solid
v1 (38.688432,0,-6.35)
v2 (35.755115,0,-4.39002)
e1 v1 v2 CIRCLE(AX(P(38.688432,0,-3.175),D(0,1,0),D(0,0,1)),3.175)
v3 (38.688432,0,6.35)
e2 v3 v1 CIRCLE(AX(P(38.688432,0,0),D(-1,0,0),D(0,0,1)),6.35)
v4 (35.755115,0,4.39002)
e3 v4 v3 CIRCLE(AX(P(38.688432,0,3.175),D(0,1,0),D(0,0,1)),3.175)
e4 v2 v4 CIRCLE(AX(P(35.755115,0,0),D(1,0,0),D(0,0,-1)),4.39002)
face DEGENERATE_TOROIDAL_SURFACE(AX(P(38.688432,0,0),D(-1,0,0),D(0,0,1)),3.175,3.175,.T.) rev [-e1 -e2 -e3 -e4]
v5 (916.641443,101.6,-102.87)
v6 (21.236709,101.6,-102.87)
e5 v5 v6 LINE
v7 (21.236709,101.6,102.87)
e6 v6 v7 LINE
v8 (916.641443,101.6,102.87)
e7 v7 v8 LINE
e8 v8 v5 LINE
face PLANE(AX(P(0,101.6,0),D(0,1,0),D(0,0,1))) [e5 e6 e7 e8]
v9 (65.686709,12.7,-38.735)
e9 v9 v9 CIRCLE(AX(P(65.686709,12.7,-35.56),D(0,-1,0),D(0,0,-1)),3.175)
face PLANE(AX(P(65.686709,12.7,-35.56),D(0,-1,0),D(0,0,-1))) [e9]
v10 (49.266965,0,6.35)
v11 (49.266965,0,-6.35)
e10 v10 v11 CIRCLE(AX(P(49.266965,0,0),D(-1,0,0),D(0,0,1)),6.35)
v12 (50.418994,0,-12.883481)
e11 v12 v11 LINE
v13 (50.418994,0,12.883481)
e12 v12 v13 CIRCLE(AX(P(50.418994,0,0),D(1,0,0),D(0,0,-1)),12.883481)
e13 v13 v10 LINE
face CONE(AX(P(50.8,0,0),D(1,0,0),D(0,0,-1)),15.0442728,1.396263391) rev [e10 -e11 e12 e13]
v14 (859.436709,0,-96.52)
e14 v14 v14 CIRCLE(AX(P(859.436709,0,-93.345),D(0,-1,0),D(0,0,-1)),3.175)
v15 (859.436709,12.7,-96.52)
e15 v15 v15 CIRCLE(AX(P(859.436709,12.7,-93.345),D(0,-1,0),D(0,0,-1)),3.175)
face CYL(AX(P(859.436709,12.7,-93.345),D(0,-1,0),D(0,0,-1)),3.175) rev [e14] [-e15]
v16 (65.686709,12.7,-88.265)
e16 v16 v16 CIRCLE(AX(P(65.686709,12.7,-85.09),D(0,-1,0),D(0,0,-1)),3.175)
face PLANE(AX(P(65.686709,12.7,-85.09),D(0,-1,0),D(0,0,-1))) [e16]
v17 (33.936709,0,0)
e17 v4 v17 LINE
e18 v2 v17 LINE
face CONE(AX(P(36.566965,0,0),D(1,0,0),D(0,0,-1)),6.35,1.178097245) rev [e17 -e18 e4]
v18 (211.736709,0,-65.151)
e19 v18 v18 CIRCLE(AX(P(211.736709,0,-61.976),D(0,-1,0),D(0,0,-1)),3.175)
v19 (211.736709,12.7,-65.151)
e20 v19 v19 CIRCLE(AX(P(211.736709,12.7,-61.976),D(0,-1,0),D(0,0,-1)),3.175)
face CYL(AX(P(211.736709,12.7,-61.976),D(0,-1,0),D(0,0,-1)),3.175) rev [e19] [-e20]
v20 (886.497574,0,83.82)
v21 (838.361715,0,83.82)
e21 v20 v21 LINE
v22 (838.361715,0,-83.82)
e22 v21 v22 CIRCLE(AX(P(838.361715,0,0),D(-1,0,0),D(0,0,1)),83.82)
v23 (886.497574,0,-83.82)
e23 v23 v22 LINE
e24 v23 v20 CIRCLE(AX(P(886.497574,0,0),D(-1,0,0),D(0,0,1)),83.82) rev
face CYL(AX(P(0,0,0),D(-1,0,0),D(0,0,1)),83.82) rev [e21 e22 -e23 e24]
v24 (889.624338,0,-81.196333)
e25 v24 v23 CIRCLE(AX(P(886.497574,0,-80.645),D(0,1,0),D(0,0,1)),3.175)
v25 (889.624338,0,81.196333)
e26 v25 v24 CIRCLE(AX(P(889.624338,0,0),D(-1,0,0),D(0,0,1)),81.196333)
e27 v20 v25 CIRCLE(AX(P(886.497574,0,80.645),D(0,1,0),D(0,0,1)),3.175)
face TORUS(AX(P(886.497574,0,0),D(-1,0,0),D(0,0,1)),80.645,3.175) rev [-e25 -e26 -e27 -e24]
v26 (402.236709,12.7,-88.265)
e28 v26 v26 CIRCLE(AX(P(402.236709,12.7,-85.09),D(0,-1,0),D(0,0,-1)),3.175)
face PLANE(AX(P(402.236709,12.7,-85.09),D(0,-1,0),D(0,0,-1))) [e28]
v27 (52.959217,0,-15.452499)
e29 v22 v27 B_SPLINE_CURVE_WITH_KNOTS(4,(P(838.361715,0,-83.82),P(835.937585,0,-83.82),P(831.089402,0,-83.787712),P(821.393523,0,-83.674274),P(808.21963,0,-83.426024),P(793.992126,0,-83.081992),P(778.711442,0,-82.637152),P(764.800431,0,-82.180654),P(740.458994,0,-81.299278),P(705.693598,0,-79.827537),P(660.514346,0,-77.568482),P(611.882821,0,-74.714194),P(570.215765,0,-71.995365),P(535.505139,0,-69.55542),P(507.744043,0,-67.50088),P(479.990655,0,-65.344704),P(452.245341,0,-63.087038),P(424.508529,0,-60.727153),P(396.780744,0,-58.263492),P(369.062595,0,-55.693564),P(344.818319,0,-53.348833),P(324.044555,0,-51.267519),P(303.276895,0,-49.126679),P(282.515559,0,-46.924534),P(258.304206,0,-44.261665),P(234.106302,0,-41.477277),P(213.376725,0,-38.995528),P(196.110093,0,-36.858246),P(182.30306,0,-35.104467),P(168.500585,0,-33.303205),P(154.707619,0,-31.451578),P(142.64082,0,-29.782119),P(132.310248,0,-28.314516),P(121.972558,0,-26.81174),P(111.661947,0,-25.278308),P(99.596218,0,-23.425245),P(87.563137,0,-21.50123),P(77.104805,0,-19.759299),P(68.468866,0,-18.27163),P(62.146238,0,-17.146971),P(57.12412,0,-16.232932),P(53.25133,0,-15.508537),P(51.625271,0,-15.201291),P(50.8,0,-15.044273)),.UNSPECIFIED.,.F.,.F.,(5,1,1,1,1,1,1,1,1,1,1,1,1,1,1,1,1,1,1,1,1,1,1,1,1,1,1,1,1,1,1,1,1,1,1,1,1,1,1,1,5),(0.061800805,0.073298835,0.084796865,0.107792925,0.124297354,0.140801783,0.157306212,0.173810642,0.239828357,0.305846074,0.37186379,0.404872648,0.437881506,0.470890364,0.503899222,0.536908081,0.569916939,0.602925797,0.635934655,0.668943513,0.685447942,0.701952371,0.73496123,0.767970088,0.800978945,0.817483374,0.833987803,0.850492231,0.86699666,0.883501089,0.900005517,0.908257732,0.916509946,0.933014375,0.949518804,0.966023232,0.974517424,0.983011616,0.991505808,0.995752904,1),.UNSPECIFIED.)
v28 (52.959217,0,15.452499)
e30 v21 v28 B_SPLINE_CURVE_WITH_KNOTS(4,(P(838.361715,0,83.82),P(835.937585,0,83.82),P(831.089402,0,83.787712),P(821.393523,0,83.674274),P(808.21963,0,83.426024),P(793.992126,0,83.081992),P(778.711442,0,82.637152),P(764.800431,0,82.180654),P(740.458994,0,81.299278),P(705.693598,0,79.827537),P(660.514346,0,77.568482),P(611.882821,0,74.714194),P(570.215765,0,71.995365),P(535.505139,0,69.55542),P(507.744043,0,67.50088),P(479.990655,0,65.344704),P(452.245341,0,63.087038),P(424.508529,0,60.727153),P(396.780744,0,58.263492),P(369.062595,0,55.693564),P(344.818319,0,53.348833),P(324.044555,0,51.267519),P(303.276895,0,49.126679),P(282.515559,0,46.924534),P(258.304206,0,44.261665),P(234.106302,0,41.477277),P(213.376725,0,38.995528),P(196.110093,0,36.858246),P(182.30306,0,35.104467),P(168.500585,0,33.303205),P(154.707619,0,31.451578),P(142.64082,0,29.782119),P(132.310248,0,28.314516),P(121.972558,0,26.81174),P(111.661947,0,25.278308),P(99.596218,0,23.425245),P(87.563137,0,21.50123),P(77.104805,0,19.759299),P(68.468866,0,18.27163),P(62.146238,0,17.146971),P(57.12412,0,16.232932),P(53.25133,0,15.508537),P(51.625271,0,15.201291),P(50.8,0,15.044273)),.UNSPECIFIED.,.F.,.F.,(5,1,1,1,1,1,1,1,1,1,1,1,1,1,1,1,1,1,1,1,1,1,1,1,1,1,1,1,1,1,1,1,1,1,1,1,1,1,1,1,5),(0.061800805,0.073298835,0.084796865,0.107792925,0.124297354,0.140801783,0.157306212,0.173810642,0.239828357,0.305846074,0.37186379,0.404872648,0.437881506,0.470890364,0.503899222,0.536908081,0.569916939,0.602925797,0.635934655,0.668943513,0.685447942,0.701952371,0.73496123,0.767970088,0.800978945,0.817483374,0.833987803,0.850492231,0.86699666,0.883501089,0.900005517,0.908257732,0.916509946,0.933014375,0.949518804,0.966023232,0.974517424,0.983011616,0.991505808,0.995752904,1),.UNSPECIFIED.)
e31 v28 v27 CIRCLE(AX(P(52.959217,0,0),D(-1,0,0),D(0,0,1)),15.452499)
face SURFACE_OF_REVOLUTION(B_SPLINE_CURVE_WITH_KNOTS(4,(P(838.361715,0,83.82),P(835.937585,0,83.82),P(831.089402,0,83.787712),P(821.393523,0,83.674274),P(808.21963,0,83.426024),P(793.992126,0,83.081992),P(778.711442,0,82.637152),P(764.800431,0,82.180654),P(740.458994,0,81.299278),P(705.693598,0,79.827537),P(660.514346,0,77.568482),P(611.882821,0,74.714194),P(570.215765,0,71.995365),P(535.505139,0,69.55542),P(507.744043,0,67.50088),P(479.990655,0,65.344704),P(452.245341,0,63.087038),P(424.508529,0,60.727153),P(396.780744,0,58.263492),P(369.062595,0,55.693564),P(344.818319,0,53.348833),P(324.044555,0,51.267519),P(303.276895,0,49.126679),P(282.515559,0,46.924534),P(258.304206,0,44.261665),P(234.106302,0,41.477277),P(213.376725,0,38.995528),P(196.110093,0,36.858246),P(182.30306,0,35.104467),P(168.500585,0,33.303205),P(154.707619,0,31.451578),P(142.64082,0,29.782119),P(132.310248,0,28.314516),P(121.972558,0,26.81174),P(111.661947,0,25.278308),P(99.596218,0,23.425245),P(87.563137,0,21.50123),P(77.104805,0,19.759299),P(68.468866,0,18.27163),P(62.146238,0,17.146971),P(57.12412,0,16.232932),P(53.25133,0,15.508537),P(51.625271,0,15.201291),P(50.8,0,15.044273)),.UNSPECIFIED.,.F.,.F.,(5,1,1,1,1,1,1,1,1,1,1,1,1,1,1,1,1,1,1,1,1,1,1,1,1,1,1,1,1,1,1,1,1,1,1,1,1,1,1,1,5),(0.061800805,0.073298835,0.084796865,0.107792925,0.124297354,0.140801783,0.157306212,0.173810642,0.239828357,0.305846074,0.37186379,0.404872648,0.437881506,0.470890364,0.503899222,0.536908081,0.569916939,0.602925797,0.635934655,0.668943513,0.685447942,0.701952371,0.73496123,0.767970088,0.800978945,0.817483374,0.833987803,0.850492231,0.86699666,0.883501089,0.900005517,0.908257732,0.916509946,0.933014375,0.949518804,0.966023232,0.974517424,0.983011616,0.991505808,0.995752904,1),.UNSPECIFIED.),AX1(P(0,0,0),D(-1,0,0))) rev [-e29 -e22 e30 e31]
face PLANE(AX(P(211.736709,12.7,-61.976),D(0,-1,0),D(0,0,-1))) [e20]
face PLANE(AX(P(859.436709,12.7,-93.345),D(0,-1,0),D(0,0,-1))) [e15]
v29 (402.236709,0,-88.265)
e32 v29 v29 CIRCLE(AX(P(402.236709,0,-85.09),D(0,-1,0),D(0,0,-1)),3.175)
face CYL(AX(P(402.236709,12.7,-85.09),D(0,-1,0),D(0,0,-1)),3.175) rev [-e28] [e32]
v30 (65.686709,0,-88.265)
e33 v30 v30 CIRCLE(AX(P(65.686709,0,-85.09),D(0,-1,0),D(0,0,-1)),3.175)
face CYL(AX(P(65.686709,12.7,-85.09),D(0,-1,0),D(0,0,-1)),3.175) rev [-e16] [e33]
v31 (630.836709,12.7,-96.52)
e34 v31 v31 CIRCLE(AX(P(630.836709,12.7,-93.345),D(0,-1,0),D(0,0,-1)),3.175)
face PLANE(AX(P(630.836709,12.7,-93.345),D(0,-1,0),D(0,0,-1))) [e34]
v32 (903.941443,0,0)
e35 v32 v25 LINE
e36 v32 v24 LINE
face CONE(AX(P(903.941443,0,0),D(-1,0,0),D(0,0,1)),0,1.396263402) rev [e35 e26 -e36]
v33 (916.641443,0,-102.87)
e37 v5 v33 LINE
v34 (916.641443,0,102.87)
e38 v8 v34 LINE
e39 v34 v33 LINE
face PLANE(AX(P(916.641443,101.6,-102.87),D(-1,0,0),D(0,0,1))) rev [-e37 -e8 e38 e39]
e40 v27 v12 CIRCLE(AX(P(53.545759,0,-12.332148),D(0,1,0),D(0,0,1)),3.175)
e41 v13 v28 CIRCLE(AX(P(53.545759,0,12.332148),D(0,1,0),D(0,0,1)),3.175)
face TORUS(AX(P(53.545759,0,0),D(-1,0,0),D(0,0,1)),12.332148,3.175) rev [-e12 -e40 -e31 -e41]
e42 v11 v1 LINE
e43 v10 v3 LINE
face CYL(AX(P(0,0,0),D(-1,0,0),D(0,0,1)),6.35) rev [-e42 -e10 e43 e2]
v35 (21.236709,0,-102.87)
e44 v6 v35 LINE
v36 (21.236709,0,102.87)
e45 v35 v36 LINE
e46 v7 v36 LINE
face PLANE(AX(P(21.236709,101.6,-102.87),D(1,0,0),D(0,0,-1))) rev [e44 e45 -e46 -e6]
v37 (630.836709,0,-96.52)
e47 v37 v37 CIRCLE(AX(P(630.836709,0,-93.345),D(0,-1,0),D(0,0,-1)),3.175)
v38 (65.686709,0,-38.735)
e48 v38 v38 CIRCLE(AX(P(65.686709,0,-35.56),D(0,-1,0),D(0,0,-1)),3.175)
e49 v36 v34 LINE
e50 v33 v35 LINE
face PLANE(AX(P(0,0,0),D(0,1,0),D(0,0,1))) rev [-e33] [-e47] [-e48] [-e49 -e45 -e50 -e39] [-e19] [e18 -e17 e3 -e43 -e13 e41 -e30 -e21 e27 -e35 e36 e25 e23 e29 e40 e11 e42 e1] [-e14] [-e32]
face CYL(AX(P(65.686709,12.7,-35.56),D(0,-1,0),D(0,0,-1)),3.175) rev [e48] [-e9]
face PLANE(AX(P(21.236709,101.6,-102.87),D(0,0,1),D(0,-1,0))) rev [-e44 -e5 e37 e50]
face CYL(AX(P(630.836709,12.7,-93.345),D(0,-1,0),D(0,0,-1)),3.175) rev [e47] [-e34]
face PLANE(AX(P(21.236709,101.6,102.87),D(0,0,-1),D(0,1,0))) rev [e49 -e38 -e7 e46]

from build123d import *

# Parameters (mm, degrees)
REVOLVE1_ANGLE         = 180
SKETCH5_W              = 895.40473358
SKETCH5_H              = 205.74
BOSS_EXTRUDE1_DEPTH    = 38.1
SKETCH9_W              = 895.40473358
SKETCH9_H              = 205.74
BOSS_EXTRUDE5_DEPTH    = 101.6
FILLET1_R              = 3.175
CUT_EXTRUDE1_OUTLINE_R = 3.175
CUT_EXTRUDE1_DEPTH     = 12.7


# Read off the part's stored shape, not the designer's step: Cut-Extrude1
with BuildPart() as part:
    # Sketch4 → Revolve1 (revolve)
    with BuildSketch(Plane(origin=(0, 0, 0), x_dir=(1, 0, 0), z_dir=(0, 1, 0))):
        with BuildLine():
            Line((838.361715067, 83.82), (889.161715067, 83.82))
            Line((889.161715067, 83.82), (903.94144259, 0))
            Line((903.94144259, 0), (33.93670901, 0))
            Line((33.93670901, 0), (36.566965131, 6.35))
            Line((36.566965131, 6.35), (49.266965131, 6.35))
            Line((49.266965131, 6.35), (50.8, 15.04427278))
            add(Edge.make_bspline(
                [(50.8, 15.04427278), (51.625271193, 15.201290881), (53.251330207, 15.508536828), (57.124119543, 16.232931828), (62.146237859, 17.146971323), (68.468865546, 18.271630494), (77.104805357, 19.759299021), (87.563136705, 21.501230362), (99.596217659, 23.425244589), (111.661947143, 25.278307663), (121.972557789, 26.811740179), (132.310247749, 28.314515819), (142.640819969, 29.78211892), (154.707618563, 31.451577511), (168.50058462, 33.303205201), (182.303059594, 35.104467069), (196.110093108, 36.858246399), (213.376725128, 38.995527561), (234.106301617, 41.477276739), (258.304205533, 44.261664544), (282.515559062, 46.924534133), (303.276895107, 49.126678738), (324.044555274, 51.267518561), (344.81831943, 53.348832955), (369.062594865, 55.693564026), (396.78074426, 58.263492413), (424.508528664, 60.72715323), (452.245340769, 63.087037809), (479.990655319, 65.344703609), (507.744043491, 67.50088036), (535.505139038, 69.555419915), (570.215765491, 71.995364991), (611.882821301, 74.714193718), (660.514345839, 77.568482026), (705.693597747, 79.827536832), (740.458993877, 81.299277883), (764.800431333, 82.180653766), (778.711441945, 82.6371517), (793.992125907, 83.081992109), (808.219629905, 83.426024247), (821.393522916, 83.6742739), (831.089402446, 83.787712376), (835.937585304, 83.82), (838.361715067, 83.82)],
                knots=[0.061800805, 0.061800805, 0.061800805, 0.061800805, 0.061800805, 0.066047901, 0.070294997, 0.078789189, 0.087283381, 0.095777573, 0.112282002, 0.12878643, 0.145290859, 0.153543073, 0.161795288, 0.178299717, 0.194804145, 0.211308574, 0.227813002, 0.244317431, 0.26082186, 0.293830717, 0.326839575, 0.359848434, 0.376352863, 0.392857292, 0.42586615, 0.458875008, 0.491883866, 0.524892724, 0.557901583, 0.590910441, 0.623919299, 0.656928157, 0.689937015, 0.755954731, 0.821972448, 0.887990163, 0.904494593, 0.920999022, 0.937503451, 0.95400788, 0.97700394, 0.98850197, 1, 1, 1, 1, 1], degree=4))
        make_face()
    revolve(axis=Axis((0, 0, 0), (1, 0, 0)), revolution_arc=REVOLVE1_ANGLE)

    # Sketch5 → Boss-Extrude1 (add)
    with BuildSketch(Plane.XZ):
        with Locations((468.9390758, 0)):
            Rectangle(SKETCH5_W, SKETCH5_H)
    extrude(amount=BOSS_EXTRUDE1_DEPTH)


with BuildPart() as body_2:
    # Sketch9 → Boss-Extrude5 (new body)
    with BuildSketch(Plane(origin=(0, 0, 0), x_dir=(1, 0, 0), z_dir=(0, 1, 0))):
        with Locations((468.9390758, 0)):
            Rectangle(SKETCH9_W, SKETCH9_H)
    extrude(amount=BOSS_EXTRUDE5_DEPTH)

    # Combine1: cut part
    add(part.part, mode=Mode.SUBTRACT)

    # Fillet1
    fillet1_edges = [body_2.edges().sort_by_distance(p)[0] for p in [
        (889.161715067, 83.82, 0),
        (50.8, 15.04427278, 0),
        (36.566965131, 6.35, 0),
    ]]
    fillet(fillet1_edges, radius=FILLET1_R)

    # Cut-Extrude1 outline → Cut-Extrude1 (cut)
    with BuildSketch(Plane(origin=(0, 0, 0), x_dir=(1, 0, 0), z_dir=(0, 1, 0))):
        with Locations((65.68670901, 35.56)):
            Circle(CUT_EXTRUDE1_OUTLINE_R)
        with Locations((402.23670901, 85.09)):
            Circle(CUT_EXTRUDE1_OUTLINE_R)
        with Locations((630.83670901, 93.345)):
            Circle(CUT_EXTRUDE1_OUTLINE_R)
        with Locations((211.73670901, 61.976)):
            Circle(CUT_EXTRUDE1_OUTLINE_R)
        with Locations((65.68670901, 85.09)):
            Circle(CUT_EXTRUDE1_OUTLINE_R)
        with Locations((859.43670901, 93.345)):
            Circle(CUT_EXTRUDE1_OUTLINE_R)
    extrude(amount=CUT_EXTRUDE1_DEPTH, mode=Mode.SUBTRACT)


solid = body_2.part
